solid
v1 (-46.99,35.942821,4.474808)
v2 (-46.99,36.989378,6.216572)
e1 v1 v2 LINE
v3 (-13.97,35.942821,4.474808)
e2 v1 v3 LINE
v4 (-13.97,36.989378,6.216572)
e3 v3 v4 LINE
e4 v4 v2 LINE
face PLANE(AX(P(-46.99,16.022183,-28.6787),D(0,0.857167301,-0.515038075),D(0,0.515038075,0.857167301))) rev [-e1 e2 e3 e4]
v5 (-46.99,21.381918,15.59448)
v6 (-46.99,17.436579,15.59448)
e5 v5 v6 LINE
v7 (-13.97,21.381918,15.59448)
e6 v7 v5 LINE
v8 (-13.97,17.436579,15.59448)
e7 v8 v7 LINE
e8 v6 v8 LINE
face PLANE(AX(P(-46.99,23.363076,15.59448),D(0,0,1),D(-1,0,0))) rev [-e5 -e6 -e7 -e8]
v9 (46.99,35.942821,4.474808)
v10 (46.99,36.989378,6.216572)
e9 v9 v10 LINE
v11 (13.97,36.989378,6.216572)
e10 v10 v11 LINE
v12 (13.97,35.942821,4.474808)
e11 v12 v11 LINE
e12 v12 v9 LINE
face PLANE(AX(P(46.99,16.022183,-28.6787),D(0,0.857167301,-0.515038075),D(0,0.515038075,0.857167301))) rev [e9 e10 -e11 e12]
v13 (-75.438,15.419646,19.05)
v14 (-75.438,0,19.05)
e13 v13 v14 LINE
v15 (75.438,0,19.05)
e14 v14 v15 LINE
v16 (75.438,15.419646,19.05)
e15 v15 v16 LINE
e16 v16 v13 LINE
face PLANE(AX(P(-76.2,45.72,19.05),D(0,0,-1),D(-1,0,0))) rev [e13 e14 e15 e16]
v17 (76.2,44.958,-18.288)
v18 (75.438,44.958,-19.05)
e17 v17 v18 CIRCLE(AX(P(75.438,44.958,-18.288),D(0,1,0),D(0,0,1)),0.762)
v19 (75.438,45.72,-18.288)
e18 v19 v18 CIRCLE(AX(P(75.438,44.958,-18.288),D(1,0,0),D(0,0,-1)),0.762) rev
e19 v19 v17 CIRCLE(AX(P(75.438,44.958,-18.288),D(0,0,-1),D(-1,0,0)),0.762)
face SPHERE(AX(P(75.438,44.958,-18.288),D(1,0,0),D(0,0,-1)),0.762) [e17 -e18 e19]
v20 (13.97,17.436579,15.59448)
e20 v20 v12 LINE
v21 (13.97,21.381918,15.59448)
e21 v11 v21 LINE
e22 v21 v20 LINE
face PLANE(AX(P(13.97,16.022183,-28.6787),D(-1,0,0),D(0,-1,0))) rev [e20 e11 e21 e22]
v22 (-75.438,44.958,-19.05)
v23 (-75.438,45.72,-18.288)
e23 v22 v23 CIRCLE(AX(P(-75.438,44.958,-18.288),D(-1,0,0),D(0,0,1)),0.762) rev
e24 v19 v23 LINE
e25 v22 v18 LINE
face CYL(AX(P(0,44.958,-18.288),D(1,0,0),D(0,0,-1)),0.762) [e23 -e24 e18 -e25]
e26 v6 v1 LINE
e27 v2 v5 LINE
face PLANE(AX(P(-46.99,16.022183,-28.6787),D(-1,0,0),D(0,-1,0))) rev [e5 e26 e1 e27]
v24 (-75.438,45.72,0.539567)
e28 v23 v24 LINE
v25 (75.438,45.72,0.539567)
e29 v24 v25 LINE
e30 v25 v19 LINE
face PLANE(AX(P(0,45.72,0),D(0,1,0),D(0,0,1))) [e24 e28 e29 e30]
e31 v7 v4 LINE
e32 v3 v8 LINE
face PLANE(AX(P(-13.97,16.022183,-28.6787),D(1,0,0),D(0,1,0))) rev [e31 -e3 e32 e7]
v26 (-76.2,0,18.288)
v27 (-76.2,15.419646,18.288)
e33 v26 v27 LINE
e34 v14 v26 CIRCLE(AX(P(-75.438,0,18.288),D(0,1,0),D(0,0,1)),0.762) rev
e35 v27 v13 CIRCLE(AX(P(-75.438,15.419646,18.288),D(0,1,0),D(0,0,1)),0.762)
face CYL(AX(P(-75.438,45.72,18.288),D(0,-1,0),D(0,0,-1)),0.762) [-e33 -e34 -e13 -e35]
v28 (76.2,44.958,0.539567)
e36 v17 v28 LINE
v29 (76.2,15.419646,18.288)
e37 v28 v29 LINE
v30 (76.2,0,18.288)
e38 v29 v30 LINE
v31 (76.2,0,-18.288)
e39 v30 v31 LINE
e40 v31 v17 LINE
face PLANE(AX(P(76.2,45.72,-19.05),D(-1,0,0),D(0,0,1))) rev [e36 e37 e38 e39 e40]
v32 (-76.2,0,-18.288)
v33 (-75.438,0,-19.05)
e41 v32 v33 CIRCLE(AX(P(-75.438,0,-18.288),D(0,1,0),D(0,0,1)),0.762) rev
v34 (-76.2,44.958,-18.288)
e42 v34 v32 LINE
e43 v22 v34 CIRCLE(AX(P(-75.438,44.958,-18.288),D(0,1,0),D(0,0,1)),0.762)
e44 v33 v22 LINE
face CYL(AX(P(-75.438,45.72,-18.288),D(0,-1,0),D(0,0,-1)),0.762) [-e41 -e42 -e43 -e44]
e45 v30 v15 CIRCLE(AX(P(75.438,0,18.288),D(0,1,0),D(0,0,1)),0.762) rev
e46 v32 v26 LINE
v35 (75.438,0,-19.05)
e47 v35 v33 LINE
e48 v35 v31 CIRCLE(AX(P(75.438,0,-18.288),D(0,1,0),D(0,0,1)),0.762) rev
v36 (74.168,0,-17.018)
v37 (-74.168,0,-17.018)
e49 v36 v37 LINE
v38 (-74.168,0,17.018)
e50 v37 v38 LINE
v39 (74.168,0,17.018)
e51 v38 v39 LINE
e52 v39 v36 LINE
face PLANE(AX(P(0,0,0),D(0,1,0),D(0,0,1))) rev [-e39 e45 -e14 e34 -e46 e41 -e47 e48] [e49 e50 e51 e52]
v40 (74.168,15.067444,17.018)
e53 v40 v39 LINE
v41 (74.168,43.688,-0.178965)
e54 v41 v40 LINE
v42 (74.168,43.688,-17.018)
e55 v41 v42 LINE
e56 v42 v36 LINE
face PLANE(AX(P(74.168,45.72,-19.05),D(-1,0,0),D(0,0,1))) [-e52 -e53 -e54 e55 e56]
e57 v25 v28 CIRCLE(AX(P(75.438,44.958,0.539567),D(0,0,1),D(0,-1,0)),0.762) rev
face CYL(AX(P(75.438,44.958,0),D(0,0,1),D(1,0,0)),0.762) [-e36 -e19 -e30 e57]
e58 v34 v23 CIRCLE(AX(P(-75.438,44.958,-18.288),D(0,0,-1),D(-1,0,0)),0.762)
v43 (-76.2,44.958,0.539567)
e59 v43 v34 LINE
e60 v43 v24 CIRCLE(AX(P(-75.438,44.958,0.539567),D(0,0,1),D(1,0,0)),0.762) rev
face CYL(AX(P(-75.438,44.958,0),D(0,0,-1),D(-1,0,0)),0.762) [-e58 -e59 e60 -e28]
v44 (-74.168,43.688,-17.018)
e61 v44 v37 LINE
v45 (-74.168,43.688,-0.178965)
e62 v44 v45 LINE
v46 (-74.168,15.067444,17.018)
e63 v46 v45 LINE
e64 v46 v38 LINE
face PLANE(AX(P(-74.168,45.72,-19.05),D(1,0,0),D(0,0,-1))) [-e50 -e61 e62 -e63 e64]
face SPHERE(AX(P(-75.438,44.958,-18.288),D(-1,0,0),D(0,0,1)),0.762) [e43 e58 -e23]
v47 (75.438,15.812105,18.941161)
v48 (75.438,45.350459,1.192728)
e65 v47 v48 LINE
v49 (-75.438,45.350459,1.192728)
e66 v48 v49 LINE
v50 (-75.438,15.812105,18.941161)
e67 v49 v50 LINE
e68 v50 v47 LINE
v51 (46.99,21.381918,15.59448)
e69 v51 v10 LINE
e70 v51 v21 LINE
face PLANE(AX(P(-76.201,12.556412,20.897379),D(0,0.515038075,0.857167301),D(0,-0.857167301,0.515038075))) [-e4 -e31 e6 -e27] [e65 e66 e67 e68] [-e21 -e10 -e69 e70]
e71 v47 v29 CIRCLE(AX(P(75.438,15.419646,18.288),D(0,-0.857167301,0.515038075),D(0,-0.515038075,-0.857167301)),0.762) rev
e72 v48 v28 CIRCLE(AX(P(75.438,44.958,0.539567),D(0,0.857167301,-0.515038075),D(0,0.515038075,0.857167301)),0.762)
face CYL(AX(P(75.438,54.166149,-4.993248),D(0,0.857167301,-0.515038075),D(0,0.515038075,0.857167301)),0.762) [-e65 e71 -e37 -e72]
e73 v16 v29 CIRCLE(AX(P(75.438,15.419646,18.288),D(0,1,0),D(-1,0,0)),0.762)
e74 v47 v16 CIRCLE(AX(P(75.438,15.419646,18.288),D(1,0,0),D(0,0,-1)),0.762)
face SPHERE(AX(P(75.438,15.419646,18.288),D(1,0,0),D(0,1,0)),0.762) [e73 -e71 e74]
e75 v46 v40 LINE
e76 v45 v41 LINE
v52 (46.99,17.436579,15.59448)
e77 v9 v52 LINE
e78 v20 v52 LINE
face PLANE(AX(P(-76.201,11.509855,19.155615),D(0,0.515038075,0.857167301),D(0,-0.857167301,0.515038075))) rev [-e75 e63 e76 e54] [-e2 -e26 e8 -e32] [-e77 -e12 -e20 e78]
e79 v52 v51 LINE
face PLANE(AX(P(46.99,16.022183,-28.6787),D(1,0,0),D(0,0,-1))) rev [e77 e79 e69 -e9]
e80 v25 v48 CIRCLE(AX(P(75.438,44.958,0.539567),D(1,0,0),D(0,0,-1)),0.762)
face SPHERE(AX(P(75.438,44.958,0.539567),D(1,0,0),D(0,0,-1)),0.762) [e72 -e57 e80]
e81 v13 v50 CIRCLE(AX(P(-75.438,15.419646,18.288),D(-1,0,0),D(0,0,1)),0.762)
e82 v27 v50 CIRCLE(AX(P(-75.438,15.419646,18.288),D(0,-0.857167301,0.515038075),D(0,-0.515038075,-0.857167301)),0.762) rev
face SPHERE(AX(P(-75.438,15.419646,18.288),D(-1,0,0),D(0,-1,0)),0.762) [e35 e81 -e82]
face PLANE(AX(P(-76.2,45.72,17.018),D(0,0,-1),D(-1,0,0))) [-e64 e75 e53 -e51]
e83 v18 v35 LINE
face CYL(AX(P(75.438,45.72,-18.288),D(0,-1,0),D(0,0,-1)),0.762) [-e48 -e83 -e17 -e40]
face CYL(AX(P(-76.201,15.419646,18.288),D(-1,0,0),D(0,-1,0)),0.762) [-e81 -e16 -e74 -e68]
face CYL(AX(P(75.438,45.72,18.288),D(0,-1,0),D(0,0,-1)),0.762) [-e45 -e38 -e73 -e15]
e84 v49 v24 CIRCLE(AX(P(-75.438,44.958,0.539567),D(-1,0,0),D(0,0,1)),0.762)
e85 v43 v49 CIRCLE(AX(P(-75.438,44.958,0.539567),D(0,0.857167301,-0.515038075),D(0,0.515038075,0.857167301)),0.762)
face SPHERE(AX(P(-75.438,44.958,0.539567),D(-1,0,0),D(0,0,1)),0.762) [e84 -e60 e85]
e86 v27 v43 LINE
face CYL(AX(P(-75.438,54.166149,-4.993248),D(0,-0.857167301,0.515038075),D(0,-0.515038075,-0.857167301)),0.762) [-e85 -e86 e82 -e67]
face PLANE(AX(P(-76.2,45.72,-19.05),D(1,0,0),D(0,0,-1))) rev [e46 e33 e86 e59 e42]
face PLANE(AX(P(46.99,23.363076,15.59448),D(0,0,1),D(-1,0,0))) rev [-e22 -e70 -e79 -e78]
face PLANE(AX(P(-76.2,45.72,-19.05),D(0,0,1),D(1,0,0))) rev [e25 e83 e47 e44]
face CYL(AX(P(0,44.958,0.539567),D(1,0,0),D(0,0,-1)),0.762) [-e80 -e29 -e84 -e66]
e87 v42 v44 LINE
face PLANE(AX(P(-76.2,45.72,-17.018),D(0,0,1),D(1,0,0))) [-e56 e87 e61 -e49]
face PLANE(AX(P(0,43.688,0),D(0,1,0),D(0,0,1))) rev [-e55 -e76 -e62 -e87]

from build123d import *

# Parameters (mm, degrees)
SKETCH1_W           = 152.4
SKETCH1_H           = 38.1
BOSS_EXTRUDE1_DEPTH = 45.72
CUT_EXTRUDE1_REACH  = 162.247
SHELL1_T            = -2.032
CUT_EXTRUDE2_REACH  = 94.207
SKETCH4_W           = 33.02
SKETCH4_H           = 16.51
FILLET1_R           = 0.762
CHAMFER1_SIZE       = 5.08
CHAMFER1_SIZE_2     = 3.052371945


with BuildPart() as part:
    # Sketch1 → Boss-Extrude1 (new body)
    with BuildSketch(Plane(origin=(0, 0, 0), x_dir=(1, 0, 0), z_dir=(0, 1, 0))):
        Rectangle(SKETCH1_W, SKETCH1_H)
    extrude(amount=BOSS_EXTRUDE1_DEPTH)

    # Sketch3 → Cut-Extrude1 (cut, up to next)
    with BuildSketch(Plane(origin=(76.2, 0, 0), x_dir=(0, 0, -1), z_dir=(1, 0, 0)), mode=Mode.PRIVATE) as cut_extrude1_sk1:
        Polygon((-19.05, 15.63096767), (-0.970685408, 45.72), (-19.05, 45.72), align=None)
    cut_extrude1_tool1 = extrude(cut_extrude1_sk1.sketch, amount=-CUT_EXTRUDE1_REACH, mode=Mode.PRIVATE) & part.part
    add(cut_extrude1_tool1.solids().sort_by_distance((76.2, 35.690323, 13.023562))[0], mode=Mode.SUBTRACT)

    # Shell1
    shell1_openings = [part.faces().sort_by_distance(p)[0] for p in [
        (0, 0, 0),
    ]]
    offset(amount=SHELL1_T, openings=shell1_openings, kind=Kind.INTERSECTION)

    # Sketch4 → Cut-Extrude2 (cut, up to next)
    with BuildSketch(Plane(origin=(0, 12.556412247, 20.897379275), x_dir=(1, 0, 0), z_dir=(0, 0.5150380749100518, 0.8571673007021139)), mode=Mode.PRIVATE) as cut_extrude2_sk1:
        with Locations((-30.48, 20.249314041)):
            Rectangle(SKETCH4_W, SKETCH4_H)
    cut_extrude2_tool1 = extrude(cut_extrude2_sk1.sketch, amount=-CUT_EXTRUDE2_REACH, mode=Mode.PRIVATE) & part.part
    # Sketch4 → Cut-Extrude2 (cut, up to next)
    with BuildSketch(Plane(origin=(0, 12.556412247, 20.897379275), x_dir=(1, 0, 0), z_dir=(0, 0.5150380749100518, 0.8571673007021139)), mode=Mode.PRIVATE) as cut_extrude2_sk2:
        with Locations((30.48, 20.249314041)):
            Rectangle(SKETCH4_W, SKETCH4_H)
    cut_extrude2_tool2 = extrude(cut_extrude2_sk2.sketch, amount=-CUT_EXTRUDE2_REACH, mode=Mode.PRIVATE) & part.part
    add(cut_extrude2_tool1.solids().sort_by_distance((-30.48, 29.913462, 10.468212))[0], mode=Mode.SUBTRACT)
    add(cut_extrude2_tool2.solids().sort_by_distance((30.48, 29.913462, 10.468212))[0], mode=Mode.SUBTRACT)

    # Fillet1
    fillet1_edges = [part.edges().sort_by_distance(p)[0] for p in [
        (-76.2, 45.72, -9.039657296),
        (76.2, 45.72, -9.039657296),
        (76.2, 7.815483835, 19.05),
        (-76.2, 7.815483835, 19.05),
        (-76.2, 30.675483835, 10.010342704),
        (0, 45.72, 0.970685408),
        (76.2, 30.675483835, 10.010342704),
        (0, 15.63096767, 19.05),
        (-76.2, 22.86, -19.05),
        (76.2, 22.86, -19.05),
        (0, 45.72, -19.05),
    ]]
    fillet(fillet1_edges, radius=FILLET1_R)

    # Chamfer1
    # the kernel refuses this chamfer: 5.08, 3.052371945 mm, written as the material it takes off along each edge
    with BuildSketch(Plane(origin=(46.99, 21.790988669, 12.978086906), x_dir=(0, -0.8672541037770177, 0.4978657645208413), z_dir=(-1, 0, 0)), Plane(origin=(-13.97, 21.790988669, 12.978086906), x_dir=(0, -0.8672541037770181, 0.49786576452084075), z_dir=(-1, 0, 0))) as chamfer1_piece_1:
        Polygon((CHAMFER1_SIZE * 0.99980168408, CHAMFER1_SIZE * 0.0199146305808), (-CHAMFER1_SIZE_2 * 0.0199146305786, CHAMFER1_SIZE_2 * 0.999801683968), (0, 0), align=None)
    extrude(amount=33.02, mode=Mode.SUBTRACT)


solid = part.part
